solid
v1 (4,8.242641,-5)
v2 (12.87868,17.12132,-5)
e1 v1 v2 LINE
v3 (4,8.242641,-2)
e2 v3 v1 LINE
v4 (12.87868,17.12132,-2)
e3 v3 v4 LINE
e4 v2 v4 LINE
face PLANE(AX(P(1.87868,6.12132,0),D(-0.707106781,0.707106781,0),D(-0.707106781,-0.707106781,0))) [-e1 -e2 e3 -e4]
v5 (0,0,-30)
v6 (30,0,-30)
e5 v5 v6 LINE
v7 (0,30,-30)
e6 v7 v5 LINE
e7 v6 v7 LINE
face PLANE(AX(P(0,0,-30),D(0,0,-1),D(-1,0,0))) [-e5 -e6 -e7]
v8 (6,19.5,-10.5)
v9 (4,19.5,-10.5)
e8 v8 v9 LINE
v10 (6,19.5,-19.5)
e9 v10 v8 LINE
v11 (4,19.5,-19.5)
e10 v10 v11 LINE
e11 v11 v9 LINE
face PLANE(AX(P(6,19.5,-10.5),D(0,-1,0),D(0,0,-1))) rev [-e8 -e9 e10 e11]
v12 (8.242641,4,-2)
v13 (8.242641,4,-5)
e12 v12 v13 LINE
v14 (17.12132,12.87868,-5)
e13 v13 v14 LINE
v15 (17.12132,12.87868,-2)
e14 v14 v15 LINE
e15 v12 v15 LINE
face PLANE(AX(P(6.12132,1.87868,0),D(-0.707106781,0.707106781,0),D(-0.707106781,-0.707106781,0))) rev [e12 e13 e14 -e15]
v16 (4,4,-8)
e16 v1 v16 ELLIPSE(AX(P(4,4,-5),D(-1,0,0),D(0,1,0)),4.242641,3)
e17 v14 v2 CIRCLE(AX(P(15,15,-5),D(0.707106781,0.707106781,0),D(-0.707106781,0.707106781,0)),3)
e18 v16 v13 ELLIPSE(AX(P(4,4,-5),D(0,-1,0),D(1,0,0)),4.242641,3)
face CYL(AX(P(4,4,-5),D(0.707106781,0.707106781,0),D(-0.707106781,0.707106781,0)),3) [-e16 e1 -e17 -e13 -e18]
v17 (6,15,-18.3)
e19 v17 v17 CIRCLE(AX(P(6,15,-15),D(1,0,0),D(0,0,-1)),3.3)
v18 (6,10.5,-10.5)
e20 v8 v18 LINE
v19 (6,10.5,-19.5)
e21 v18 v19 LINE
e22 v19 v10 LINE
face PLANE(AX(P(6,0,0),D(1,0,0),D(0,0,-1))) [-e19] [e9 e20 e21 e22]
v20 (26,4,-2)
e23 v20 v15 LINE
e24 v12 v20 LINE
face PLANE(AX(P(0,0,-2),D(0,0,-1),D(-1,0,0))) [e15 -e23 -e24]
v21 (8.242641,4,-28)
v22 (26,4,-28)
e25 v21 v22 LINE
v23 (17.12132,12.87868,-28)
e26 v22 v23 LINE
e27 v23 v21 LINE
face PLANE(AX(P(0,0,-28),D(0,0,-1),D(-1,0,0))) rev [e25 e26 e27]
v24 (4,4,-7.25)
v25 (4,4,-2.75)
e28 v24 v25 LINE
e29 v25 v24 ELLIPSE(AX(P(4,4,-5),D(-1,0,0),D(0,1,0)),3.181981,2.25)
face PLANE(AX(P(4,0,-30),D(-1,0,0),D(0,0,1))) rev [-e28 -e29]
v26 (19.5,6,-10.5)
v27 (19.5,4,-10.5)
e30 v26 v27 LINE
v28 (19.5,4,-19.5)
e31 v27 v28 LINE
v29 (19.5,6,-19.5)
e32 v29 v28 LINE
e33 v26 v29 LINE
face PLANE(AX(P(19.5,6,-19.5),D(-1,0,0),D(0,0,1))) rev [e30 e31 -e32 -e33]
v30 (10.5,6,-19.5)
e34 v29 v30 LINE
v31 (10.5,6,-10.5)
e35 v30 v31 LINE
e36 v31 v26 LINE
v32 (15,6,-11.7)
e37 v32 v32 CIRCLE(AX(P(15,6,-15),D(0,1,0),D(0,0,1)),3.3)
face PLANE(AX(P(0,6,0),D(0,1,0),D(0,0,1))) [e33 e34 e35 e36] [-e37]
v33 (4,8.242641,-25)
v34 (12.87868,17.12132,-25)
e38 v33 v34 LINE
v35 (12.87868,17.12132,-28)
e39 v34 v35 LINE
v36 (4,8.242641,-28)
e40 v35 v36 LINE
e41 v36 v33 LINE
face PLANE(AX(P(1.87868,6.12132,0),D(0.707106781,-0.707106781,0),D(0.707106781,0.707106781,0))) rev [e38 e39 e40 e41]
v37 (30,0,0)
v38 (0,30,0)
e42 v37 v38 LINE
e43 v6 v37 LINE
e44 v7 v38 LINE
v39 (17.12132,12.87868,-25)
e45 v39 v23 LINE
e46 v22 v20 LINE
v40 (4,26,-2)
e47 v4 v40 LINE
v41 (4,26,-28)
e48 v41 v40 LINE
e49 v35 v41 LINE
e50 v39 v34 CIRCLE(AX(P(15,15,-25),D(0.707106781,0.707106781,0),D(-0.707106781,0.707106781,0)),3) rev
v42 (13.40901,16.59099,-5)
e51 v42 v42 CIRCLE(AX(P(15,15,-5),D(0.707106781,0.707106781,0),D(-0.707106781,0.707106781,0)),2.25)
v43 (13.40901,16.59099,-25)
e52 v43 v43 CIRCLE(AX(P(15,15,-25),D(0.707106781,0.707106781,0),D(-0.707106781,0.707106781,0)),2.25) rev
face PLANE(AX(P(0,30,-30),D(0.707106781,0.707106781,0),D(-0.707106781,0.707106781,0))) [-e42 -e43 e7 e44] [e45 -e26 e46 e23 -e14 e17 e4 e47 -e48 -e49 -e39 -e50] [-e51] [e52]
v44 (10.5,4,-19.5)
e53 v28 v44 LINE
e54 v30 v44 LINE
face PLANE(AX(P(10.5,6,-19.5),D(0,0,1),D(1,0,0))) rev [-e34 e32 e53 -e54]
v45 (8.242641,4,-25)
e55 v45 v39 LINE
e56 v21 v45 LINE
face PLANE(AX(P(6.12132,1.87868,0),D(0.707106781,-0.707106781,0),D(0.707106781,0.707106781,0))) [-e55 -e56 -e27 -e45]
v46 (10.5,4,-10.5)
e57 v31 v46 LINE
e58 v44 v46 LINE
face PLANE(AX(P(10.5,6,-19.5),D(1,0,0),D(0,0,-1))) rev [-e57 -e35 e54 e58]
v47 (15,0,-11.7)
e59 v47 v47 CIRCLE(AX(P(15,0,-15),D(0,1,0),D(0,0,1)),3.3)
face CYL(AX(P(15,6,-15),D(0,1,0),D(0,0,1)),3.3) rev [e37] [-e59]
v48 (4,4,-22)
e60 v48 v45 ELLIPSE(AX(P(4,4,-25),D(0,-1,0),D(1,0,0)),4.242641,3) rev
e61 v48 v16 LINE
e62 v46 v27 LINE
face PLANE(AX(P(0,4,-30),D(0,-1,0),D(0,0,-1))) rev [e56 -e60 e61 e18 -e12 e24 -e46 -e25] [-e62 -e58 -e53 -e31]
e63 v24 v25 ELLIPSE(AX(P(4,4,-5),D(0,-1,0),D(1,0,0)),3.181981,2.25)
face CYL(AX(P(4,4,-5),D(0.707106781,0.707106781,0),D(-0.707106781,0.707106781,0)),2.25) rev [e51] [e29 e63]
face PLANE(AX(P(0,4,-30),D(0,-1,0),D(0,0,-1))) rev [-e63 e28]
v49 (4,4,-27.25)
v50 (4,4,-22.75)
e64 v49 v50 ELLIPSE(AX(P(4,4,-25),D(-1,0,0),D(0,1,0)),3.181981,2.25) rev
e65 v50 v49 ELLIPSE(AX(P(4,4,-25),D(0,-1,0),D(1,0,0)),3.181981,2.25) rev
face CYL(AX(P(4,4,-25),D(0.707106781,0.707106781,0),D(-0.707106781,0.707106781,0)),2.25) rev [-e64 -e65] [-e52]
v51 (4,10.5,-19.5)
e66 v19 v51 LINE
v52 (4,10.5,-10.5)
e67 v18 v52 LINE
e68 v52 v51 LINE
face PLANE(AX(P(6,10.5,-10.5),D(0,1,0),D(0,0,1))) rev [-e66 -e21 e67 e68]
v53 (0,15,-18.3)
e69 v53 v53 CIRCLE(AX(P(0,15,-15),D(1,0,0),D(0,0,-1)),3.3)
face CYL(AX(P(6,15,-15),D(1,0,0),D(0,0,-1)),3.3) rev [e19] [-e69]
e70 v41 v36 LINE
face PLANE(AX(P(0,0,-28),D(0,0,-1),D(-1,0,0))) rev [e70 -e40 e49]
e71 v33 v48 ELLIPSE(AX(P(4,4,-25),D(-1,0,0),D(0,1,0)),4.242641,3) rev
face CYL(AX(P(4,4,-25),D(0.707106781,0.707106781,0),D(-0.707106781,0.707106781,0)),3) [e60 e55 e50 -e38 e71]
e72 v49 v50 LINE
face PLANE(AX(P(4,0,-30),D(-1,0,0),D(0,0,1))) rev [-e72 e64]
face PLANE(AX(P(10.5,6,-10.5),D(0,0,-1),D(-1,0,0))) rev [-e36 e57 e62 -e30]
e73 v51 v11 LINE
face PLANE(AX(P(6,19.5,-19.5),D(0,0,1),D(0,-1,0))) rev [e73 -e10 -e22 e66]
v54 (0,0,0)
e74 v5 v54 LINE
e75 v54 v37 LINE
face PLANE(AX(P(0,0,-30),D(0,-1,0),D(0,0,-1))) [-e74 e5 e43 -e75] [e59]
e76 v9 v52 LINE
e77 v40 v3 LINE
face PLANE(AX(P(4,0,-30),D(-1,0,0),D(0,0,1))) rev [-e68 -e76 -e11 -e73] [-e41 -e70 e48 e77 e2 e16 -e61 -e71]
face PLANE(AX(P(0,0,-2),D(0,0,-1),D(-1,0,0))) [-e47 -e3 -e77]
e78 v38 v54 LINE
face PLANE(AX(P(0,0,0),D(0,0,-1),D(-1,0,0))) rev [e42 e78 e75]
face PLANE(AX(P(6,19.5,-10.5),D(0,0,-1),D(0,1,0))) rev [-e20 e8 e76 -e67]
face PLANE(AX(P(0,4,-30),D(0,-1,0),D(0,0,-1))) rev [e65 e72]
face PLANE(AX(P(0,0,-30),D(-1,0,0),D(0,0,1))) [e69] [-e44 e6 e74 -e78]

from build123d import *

# Parameters (mm, degrees)
BOSS_EXTRUDE1_DEPTH  = 30
SHELL1_START         = 4
SHELL1_OUTLINE_W     = 23
SHELL1_OUTLINE_H     = 26
SHELL1_DEPTH         = 22
SKETCH2_W            = 9
SKETCH2_H            = 9
BOSS_EXTRUDE2_DEPTH  = 2
SKETCH3_W            = 9
SKETCH3_H            = 9
BOSS_EXTRUDE3_DEPTH  = 2
BOSS_EXTRUDE4_START  = -15.556349
SKETCH4_R            = 2.25
BOSS_EXTRUDE4_DEPTH  = 15.556349
M6_CLEARANCE_HOLE2_D = 6.6
M6_CLEARANCE_HOLE3_D = 6.6


# Read off the part's stored shape, not the designer's step: Shell1
with BuildPart() as part:
    # Sketch1 → Boss-Extrude1 (new body)
    with BuildSketch(Plane.XY):
        Polygon((0, 0), (30, 0), (0, 30), align=None)
    extrude(amount=-BOSS_EXTRUDE1_DEPTH)

    # Shell1 outline → Shell1 (cut)
    with BuildSketch(Plane.YZ.offset(SHELL1_START)):
        with Locations((15.5, -15)):
            Rectangle(SHELL1_OUTLINE_W, SHELL1_OUTLINE_H)
    extrude(amount=SHELL1_DEPTH, mode=Mode.SUBTRACT)

    # Sketch2 → Boss-Extrude2 (add)
    with BuildSketch(Plane(origin=(0, 4, 0), x_dir=(1, 0, 0), z_dir=(0, 1, 0))):
        with Locations((15, 15)):
            Rectangle(SKETCH2_W, SKETCH2_H)
    extrude(amount=BOSS_EXTRUDE2_DEPTH)

    # Sketch3 → Boss-Extrude3 (add)
    with BuildSketch(Plane(origin=(4, 0, 0), x_dir=(0, 0, -1), z_dir=(1, 0, 0))):
        with Locations((15, 15)):
            Rectangle(SKETCH3_W, SKETCH3_H)
    extrude(amount=BOSS_EXTRUDE3_DEPTH)

    # Sketch4 → Boss-Extrude4 (add)
    # profile 1 of 2: a face of its own
    with BuildSketch(Plane(origin=(15, 15, 0), x_dir=(0, 0, -1), z_dir=(0.7071067811865477, 0.7071067811865475, 0)).offset(BOSS_EXTRUDE4_START)):
        with BuildLine():
            Line((2, 3), (2, -3))
            Line((2, -3), (5, -3))
            ThreePointArc((5, -3), (8, 0), (5, 3))
            Line((5, 3), (2, 3))
        make_face()
        with Locations(Location((5, 0, 0), (0, 0, 90))):
            Circle(SKETCH4_R, mode=Mode.SUBTRACT)
    # profile 2 of 2: a face of its own
    with BuildSketch(Plane(origin=(15, 15, 0), x_dir=(0, 0, -1), z_dir=(0.7071067811865477, 0.7071067811865475, 0)).offset(BOSS_EXTRUDE4_START)):
        with BuildLine():
            Line((25, -3), (28, -3))
            Line((28, -3), (28, 3))
            Line((28, 3), (25, 3))
            ThreePointArc((25, 3), (22, 0), (25, -3))
        make_face()
        with Locations(Location((25, 0, 0), (0, 0, 90))):
            Circle(SKETCH4_R, mode=Mode.SUBTRACT)
    extrude(amount=BOSS_EXTRUDE4_DEPTH)

    # M6 Clearance Hole2 (through all)
    with Locations(Plane(origin=(0, 6, 0), x_dir=(1, 0, 0), z_dir=(0, 1, 0))):
        with Locations((15, 15)):
            Hole(M6_CLEARANCE_HOLE2_D / 2)

    # M6 Clearance Hole3 (through all)
    with Locations(Plane(origin=(6, 0, 0), x_dir=(0, 0, -1), z_dir=(1, 0, 0))):
        with Locations((15, 15)):
            Hole(M6_CLEARANCE_HOLE3_D / 2)


solid = part.part
